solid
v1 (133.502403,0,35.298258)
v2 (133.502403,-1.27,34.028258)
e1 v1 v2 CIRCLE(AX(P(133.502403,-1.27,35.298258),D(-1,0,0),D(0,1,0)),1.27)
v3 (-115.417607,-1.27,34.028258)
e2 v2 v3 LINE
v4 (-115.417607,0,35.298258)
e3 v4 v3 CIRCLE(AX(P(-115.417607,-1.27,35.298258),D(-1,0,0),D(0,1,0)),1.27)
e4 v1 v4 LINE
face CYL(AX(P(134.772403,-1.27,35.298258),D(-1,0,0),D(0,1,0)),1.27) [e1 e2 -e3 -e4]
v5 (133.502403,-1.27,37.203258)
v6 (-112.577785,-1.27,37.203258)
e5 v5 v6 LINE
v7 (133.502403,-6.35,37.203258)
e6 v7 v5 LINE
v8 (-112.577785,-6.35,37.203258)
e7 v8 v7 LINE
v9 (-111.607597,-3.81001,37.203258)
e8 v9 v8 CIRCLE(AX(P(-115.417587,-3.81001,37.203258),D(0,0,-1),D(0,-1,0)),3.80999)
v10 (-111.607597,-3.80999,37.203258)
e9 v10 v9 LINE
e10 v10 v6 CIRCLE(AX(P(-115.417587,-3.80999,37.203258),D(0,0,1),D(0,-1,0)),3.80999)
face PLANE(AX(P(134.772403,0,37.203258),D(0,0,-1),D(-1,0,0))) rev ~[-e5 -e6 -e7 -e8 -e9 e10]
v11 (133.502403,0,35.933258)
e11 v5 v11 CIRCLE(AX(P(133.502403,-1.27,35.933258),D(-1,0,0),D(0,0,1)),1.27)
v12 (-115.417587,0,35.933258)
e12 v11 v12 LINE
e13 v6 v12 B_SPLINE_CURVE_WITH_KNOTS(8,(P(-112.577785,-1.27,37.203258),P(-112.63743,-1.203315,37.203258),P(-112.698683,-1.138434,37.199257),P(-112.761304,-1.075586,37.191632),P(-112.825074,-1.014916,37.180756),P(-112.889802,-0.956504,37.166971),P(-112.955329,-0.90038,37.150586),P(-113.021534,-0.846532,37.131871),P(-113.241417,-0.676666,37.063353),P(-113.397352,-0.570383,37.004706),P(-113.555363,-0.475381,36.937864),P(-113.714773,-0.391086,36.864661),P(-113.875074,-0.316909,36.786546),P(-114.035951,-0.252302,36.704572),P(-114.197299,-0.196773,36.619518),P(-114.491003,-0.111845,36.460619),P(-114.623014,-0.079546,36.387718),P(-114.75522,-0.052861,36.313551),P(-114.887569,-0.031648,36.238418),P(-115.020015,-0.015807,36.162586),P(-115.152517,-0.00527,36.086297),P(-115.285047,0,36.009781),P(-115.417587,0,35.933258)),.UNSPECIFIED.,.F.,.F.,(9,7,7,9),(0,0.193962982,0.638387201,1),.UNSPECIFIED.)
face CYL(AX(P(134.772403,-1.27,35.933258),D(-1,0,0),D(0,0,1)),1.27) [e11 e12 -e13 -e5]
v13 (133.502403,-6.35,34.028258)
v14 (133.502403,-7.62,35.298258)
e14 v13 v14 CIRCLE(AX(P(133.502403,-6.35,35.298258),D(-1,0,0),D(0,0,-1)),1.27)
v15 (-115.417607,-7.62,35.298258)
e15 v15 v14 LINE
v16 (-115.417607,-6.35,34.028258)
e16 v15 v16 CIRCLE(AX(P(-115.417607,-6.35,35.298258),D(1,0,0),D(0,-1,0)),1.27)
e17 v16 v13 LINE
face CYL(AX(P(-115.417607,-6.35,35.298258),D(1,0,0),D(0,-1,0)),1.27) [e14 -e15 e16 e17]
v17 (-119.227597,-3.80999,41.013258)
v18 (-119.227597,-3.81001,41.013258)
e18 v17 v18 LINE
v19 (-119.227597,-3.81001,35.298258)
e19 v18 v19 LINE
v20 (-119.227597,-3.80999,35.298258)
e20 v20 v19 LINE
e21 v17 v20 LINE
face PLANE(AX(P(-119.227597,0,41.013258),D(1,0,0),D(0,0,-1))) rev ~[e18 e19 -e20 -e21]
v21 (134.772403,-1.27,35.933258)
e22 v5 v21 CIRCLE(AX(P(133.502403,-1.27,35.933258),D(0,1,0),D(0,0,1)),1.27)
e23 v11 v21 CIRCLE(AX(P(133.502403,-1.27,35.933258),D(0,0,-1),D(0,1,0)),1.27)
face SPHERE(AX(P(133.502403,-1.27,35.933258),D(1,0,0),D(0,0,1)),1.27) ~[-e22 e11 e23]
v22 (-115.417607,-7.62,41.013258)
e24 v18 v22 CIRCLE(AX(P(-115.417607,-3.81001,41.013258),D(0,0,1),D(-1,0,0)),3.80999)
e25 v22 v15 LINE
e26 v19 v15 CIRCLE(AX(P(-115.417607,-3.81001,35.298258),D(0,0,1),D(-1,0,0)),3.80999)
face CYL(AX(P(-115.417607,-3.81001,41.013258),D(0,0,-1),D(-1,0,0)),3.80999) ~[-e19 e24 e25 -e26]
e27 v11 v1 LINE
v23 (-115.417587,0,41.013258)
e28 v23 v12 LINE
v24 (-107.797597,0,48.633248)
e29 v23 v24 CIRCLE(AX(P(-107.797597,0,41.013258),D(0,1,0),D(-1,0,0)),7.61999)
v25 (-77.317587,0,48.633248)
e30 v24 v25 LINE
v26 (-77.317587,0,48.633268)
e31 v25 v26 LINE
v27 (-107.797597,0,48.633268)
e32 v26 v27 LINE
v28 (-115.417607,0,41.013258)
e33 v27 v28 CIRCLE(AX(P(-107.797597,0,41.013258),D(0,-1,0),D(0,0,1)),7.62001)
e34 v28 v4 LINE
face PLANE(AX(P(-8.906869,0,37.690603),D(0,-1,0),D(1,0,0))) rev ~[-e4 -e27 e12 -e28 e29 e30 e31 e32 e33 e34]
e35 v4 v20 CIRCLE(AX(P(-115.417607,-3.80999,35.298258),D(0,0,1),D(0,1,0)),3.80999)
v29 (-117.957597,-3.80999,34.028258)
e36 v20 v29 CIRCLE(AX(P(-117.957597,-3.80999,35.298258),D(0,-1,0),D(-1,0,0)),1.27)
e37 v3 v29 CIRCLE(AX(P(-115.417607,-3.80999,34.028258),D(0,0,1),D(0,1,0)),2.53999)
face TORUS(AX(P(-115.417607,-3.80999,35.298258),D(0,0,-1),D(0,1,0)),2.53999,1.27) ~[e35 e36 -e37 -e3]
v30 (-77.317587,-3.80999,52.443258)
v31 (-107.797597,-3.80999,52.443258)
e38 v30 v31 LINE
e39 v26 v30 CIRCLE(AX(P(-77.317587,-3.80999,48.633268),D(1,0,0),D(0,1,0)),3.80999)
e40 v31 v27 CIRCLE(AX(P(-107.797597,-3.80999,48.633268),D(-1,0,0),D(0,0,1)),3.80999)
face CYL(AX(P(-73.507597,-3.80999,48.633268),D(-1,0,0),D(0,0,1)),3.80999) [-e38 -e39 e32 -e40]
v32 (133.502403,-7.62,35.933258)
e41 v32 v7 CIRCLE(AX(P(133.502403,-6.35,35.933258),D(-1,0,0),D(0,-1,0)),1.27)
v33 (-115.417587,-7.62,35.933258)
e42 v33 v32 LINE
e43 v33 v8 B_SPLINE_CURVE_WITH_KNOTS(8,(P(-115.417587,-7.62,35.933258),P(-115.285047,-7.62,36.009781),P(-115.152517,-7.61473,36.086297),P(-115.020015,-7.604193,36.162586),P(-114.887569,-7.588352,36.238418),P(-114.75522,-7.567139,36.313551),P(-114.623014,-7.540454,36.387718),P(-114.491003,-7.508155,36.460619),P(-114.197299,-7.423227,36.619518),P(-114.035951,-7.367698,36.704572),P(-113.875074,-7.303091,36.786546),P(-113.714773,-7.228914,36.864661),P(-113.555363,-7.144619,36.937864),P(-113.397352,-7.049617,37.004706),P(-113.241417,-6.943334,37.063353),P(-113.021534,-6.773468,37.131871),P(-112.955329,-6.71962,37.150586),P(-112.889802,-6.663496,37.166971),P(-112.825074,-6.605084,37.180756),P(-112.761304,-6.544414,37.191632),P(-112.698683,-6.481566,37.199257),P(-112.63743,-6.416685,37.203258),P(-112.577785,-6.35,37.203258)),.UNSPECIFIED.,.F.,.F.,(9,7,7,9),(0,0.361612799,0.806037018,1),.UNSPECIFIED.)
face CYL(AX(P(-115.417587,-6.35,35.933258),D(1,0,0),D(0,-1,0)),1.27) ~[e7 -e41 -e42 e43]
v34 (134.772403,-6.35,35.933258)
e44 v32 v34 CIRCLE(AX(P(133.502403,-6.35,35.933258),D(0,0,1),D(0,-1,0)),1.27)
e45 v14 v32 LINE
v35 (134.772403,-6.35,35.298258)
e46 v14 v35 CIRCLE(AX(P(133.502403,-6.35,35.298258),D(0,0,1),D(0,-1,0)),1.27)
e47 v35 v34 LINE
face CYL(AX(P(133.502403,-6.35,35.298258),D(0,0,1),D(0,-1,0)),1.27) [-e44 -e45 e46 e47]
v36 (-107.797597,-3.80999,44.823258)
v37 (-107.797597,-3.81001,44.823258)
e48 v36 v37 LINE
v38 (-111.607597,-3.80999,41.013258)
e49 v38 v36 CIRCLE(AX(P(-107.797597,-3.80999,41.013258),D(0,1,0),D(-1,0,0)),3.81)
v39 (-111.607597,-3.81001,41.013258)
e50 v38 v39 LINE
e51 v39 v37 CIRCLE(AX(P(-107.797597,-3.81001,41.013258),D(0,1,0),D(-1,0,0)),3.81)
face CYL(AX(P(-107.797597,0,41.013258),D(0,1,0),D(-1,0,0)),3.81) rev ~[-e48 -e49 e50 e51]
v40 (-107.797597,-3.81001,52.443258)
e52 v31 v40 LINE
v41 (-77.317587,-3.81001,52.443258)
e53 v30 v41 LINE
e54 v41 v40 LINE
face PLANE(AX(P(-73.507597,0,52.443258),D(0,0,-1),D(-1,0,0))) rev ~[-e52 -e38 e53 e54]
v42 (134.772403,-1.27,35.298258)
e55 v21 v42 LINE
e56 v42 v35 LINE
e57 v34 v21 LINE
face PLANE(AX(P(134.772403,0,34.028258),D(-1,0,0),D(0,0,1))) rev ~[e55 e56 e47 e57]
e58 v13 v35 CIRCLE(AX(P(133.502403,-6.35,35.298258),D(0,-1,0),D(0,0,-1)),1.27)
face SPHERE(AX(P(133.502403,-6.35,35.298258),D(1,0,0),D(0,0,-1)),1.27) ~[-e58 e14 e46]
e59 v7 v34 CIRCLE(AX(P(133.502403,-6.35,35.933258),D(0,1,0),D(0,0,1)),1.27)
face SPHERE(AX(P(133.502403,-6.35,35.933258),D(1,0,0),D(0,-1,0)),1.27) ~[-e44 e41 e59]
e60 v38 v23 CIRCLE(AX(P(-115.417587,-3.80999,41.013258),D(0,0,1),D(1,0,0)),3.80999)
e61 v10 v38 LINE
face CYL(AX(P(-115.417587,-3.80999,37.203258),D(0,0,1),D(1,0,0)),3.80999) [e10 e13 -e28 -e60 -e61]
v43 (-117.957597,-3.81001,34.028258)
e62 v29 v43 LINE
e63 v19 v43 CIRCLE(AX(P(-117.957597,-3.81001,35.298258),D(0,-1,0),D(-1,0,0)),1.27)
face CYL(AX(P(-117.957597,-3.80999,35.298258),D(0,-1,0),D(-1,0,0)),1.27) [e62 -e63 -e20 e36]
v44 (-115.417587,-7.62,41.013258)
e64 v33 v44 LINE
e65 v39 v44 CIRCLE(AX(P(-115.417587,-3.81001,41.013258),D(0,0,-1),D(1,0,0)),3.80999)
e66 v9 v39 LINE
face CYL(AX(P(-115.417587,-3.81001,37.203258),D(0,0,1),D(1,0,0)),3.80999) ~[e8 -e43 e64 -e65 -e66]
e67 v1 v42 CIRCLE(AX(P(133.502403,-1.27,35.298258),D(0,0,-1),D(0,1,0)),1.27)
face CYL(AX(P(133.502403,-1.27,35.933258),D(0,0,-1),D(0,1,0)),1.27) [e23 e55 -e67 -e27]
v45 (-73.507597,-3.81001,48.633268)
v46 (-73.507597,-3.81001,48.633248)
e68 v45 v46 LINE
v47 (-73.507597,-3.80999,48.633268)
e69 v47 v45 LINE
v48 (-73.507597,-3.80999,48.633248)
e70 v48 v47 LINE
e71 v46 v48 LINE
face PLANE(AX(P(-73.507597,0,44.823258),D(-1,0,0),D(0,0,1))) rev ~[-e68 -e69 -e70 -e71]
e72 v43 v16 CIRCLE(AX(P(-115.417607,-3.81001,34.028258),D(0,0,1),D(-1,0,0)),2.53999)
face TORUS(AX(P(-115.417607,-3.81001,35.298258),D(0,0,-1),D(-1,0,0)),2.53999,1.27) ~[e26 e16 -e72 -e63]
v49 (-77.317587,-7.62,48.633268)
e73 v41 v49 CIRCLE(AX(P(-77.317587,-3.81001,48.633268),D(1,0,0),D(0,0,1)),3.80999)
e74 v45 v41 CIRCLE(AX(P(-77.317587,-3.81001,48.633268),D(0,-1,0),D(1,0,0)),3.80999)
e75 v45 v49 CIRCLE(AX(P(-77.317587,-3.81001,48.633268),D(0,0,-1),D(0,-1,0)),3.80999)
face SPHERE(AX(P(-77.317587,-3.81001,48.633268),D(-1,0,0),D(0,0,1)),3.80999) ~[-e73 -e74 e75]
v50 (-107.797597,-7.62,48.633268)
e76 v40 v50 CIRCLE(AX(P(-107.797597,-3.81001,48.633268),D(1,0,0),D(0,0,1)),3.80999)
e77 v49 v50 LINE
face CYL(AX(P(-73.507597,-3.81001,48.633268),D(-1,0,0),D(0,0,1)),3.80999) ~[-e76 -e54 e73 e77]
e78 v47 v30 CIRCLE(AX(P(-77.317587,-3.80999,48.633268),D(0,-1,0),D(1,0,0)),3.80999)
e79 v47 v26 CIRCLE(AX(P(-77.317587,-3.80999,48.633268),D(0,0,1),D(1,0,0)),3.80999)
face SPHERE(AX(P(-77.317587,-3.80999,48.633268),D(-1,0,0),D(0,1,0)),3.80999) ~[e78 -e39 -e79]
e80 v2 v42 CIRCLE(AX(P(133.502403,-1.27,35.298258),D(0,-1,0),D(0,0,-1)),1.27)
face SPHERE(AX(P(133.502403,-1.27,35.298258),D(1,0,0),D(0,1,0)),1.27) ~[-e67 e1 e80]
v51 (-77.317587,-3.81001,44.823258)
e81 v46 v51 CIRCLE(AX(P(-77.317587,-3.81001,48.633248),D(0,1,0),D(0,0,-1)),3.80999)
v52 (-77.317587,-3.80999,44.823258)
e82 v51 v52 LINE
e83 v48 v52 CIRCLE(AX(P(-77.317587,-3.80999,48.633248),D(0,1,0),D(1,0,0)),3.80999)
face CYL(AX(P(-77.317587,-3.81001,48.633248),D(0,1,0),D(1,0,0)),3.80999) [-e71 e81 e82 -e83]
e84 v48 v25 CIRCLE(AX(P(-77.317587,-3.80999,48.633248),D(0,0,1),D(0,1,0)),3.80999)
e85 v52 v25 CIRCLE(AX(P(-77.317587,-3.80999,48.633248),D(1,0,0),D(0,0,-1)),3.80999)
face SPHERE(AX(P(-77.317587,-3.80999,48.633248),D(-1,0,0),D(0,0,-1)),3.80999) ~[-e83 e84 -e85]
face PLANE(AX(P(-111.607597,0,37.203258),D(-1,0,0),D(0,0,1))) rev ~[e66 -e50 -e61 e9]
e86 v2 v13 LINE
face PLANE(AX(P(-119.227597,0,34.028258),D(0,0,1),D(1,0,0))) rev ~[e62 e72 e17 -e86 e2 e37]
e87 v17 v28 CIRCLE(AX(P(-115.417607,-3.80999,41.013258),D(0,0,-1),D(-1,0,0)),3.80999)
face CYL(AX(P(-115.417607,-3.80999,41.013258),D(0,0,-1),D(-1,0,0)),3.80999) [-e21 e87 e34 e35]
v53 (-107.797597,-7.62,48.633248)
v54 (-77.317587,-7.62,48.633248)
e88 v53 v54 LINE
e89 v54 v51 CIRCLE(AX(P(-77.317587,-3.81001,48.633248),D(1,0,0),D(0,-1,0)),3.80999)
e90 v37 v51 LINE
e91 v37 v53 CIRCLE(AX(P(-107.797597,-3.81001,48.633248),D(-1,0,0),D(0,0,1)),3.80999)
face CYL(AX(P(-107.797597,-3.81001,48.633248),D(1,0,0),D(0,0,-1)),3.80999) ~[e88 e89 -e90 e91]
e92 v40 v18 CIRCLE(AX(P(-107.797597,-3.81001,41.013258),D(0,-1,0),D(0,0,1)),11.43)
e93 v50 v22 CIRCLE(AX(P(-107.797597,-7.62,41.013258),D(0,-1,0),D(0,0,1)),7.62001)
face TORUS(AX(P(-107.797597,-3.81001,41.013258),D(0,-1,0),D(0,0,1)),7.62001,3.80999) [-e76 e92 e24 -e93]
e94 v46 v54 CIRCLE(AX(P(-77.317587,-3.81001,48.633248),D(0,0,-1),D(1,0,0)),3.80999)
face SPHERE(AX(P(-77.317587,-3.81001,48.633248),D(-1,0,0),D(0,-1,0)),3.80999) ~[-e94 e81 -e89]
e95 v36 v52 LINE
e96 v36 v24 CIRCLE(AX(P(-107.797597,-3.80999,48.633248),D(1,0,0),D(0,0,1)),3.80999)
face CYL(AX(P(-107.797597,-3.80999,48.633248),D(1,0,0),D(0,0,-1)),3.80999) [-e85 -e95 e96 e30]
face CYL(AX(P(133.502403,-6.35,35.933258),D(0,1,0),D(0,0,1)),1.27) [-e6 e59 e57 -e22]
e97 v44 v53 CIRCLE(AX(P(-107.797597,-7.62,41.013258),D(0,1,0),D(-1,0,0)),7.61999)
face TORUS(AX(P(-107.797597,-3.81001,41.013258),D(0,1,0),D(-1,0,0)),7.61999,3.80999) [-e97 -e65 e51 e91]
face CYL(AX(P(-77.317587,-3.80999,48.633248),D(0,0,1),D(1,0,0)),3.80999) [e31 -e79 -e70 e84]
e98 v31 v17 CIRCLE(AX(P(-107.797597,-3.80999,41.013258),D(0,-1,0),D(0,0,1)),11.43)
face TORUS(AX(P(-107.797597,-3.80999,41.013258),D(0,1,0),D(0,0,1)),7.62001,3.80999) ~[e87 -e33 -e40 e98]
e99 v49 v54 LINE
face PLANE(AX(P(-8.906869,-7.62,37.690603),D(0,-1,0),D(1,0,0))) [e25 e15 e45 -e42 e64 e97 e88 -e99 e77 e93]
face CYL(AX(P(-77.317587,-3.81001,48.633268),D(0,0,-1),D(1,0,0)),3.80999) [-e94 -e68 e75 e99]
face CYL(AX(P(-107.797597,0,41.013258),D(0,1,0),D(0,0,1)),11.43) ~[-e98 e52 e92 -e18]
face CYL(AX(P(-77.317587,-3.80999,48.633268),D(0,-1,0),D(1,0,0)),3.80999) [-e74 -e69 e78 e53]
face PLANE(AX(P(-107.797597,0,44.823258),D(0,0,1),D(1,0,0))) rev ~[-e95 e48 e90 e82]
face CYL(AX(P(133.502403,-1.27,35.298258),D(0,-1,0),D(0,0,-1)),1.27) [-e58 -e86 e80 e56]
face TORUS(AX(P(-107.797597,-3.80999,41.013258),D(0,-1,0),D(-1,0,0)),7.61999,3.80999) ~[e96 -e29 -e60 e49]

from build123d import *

# Parameters (mm, degrees)
F1_DEPTH = 7.62
F2_R     = 3.80999
F3_R     = 3.80999
F4_R     = 1.27
F5_R     = 1.27


# Not quite as in the source:
# - a fillet or chamfer is up to 0.001 mm smaller than in the source, because OpenCascade refuses the exact size


with BuildPart() as f1:
    # F0 (on Front) → F1 (new body)
    with BuildSketch(Plane.XZ):
        with BuildLine():
            Line((134.7724028379, 37.2032584392), (-111.6075971621, 37.2032584392))
            Line((-111.6075971621, 37.2032584392), (-111.6075971621, 41.0132584392))
            ThreePointArc((-111.6075971621, 41.0132584392), (-110.4916739984, 43.7073352756), (-107.7975971621, 44.8232584392))
            Line((-107.7975971621, 44.8232584392), (-73.5075971621, 44.8232584392))
            Line((-73.5075971621, 44.8232584392), (-73.5075971621, 52.4432584392))
            Line((-73.5075971621, 52.4432584392), (-107.7975971621, 52.4432584392))
            ThreePointArc((-107.7975971621, 52.4432584392), (-115.8798276711, 49.0954889482), (-119.2275971621, 41.0132584392))
            Line((-119.2275971621, 41.0132584392), (-119.2275971621, 37.2032584392))
            Line((-119.2275971621, 37.2032584392), (-119.2275971621, 34.0282584392))
            Line((-119.2275971621, 34.0282584392), (134.7724028379, 34.0282584392))
            Line((134.7724028379, 34.0282584392), (134.7724028379, 37.2032584392))
        make_face()
    extrude(amount=F1_DEPTH)

    # F2 (radius 3.81 in the source; OpenCascade refuses exactly that, so slightly less here)
    f2_edges = [f1.edges().sort_by_distance(p)[0] for p in [
        (-90.652597, -7.62, 52.443258),
        (-90.652597, -7.62, 44.823258),
        (-90.652597, 0, 44.823258),
        (-90.652597, 0, 52.443258),
    ]]
    fillet(f2_edges, radius=F2_R)

    # F3 (radius 3.81 in the source; OpenCascade refuses exactly that, so slightly less here)
    f3_edges = [f1.edges().sort_by_distance(p)[0] for p in [
        (-73.507597, -3.81, 52.443258),
        (-73.507597, -1.11592, 51.327338),
        (-73.507597, 0, 48.633258),
        (-73.507597, -1.11592, 45.939179),
        (-73.507597, -3.81, 44.823258),
        (-73.507597, -6.50408, 45.939179),
        (-73.507597, -6.50408, 51.327338),
        (-73.507597, -7.62, 48.633258),
    ]]
    fillet(f3_edges, radius=F3_R)

    # F4
    f4_edges = [f1.edges().sort_by_distance(p)[0] for p in [
        (11.582403, -7.62, 37.203258),
        (9.677398, -7.62, 34.028258),
        (11.582403, 0, 37.203258),
        (9.677398, 0, 34.028258),
    ]]
    fillet(f4_edges, radius=F4_R)

    # F5
    f5_edges = [f1.edges().sort_by_distance(p)[0] for p in [
        (134.772403, -7.248026, 36.831284),
        (134.772403, -7.62, 35.615758),
        (134.772403, -7.248026, 34.400233),
        (134.772403, -3.81, 34.028258),
        (134.772403, -0.371974, 34.400233),
        (134.772403, 0, 35.615758),
        (134.772403, -3.81, 37.203258),
        (134.772403, -0.371974, 36.831284),
    ]]
    fillet(f5_edges, radius=F5_R)


solid = f1.part
